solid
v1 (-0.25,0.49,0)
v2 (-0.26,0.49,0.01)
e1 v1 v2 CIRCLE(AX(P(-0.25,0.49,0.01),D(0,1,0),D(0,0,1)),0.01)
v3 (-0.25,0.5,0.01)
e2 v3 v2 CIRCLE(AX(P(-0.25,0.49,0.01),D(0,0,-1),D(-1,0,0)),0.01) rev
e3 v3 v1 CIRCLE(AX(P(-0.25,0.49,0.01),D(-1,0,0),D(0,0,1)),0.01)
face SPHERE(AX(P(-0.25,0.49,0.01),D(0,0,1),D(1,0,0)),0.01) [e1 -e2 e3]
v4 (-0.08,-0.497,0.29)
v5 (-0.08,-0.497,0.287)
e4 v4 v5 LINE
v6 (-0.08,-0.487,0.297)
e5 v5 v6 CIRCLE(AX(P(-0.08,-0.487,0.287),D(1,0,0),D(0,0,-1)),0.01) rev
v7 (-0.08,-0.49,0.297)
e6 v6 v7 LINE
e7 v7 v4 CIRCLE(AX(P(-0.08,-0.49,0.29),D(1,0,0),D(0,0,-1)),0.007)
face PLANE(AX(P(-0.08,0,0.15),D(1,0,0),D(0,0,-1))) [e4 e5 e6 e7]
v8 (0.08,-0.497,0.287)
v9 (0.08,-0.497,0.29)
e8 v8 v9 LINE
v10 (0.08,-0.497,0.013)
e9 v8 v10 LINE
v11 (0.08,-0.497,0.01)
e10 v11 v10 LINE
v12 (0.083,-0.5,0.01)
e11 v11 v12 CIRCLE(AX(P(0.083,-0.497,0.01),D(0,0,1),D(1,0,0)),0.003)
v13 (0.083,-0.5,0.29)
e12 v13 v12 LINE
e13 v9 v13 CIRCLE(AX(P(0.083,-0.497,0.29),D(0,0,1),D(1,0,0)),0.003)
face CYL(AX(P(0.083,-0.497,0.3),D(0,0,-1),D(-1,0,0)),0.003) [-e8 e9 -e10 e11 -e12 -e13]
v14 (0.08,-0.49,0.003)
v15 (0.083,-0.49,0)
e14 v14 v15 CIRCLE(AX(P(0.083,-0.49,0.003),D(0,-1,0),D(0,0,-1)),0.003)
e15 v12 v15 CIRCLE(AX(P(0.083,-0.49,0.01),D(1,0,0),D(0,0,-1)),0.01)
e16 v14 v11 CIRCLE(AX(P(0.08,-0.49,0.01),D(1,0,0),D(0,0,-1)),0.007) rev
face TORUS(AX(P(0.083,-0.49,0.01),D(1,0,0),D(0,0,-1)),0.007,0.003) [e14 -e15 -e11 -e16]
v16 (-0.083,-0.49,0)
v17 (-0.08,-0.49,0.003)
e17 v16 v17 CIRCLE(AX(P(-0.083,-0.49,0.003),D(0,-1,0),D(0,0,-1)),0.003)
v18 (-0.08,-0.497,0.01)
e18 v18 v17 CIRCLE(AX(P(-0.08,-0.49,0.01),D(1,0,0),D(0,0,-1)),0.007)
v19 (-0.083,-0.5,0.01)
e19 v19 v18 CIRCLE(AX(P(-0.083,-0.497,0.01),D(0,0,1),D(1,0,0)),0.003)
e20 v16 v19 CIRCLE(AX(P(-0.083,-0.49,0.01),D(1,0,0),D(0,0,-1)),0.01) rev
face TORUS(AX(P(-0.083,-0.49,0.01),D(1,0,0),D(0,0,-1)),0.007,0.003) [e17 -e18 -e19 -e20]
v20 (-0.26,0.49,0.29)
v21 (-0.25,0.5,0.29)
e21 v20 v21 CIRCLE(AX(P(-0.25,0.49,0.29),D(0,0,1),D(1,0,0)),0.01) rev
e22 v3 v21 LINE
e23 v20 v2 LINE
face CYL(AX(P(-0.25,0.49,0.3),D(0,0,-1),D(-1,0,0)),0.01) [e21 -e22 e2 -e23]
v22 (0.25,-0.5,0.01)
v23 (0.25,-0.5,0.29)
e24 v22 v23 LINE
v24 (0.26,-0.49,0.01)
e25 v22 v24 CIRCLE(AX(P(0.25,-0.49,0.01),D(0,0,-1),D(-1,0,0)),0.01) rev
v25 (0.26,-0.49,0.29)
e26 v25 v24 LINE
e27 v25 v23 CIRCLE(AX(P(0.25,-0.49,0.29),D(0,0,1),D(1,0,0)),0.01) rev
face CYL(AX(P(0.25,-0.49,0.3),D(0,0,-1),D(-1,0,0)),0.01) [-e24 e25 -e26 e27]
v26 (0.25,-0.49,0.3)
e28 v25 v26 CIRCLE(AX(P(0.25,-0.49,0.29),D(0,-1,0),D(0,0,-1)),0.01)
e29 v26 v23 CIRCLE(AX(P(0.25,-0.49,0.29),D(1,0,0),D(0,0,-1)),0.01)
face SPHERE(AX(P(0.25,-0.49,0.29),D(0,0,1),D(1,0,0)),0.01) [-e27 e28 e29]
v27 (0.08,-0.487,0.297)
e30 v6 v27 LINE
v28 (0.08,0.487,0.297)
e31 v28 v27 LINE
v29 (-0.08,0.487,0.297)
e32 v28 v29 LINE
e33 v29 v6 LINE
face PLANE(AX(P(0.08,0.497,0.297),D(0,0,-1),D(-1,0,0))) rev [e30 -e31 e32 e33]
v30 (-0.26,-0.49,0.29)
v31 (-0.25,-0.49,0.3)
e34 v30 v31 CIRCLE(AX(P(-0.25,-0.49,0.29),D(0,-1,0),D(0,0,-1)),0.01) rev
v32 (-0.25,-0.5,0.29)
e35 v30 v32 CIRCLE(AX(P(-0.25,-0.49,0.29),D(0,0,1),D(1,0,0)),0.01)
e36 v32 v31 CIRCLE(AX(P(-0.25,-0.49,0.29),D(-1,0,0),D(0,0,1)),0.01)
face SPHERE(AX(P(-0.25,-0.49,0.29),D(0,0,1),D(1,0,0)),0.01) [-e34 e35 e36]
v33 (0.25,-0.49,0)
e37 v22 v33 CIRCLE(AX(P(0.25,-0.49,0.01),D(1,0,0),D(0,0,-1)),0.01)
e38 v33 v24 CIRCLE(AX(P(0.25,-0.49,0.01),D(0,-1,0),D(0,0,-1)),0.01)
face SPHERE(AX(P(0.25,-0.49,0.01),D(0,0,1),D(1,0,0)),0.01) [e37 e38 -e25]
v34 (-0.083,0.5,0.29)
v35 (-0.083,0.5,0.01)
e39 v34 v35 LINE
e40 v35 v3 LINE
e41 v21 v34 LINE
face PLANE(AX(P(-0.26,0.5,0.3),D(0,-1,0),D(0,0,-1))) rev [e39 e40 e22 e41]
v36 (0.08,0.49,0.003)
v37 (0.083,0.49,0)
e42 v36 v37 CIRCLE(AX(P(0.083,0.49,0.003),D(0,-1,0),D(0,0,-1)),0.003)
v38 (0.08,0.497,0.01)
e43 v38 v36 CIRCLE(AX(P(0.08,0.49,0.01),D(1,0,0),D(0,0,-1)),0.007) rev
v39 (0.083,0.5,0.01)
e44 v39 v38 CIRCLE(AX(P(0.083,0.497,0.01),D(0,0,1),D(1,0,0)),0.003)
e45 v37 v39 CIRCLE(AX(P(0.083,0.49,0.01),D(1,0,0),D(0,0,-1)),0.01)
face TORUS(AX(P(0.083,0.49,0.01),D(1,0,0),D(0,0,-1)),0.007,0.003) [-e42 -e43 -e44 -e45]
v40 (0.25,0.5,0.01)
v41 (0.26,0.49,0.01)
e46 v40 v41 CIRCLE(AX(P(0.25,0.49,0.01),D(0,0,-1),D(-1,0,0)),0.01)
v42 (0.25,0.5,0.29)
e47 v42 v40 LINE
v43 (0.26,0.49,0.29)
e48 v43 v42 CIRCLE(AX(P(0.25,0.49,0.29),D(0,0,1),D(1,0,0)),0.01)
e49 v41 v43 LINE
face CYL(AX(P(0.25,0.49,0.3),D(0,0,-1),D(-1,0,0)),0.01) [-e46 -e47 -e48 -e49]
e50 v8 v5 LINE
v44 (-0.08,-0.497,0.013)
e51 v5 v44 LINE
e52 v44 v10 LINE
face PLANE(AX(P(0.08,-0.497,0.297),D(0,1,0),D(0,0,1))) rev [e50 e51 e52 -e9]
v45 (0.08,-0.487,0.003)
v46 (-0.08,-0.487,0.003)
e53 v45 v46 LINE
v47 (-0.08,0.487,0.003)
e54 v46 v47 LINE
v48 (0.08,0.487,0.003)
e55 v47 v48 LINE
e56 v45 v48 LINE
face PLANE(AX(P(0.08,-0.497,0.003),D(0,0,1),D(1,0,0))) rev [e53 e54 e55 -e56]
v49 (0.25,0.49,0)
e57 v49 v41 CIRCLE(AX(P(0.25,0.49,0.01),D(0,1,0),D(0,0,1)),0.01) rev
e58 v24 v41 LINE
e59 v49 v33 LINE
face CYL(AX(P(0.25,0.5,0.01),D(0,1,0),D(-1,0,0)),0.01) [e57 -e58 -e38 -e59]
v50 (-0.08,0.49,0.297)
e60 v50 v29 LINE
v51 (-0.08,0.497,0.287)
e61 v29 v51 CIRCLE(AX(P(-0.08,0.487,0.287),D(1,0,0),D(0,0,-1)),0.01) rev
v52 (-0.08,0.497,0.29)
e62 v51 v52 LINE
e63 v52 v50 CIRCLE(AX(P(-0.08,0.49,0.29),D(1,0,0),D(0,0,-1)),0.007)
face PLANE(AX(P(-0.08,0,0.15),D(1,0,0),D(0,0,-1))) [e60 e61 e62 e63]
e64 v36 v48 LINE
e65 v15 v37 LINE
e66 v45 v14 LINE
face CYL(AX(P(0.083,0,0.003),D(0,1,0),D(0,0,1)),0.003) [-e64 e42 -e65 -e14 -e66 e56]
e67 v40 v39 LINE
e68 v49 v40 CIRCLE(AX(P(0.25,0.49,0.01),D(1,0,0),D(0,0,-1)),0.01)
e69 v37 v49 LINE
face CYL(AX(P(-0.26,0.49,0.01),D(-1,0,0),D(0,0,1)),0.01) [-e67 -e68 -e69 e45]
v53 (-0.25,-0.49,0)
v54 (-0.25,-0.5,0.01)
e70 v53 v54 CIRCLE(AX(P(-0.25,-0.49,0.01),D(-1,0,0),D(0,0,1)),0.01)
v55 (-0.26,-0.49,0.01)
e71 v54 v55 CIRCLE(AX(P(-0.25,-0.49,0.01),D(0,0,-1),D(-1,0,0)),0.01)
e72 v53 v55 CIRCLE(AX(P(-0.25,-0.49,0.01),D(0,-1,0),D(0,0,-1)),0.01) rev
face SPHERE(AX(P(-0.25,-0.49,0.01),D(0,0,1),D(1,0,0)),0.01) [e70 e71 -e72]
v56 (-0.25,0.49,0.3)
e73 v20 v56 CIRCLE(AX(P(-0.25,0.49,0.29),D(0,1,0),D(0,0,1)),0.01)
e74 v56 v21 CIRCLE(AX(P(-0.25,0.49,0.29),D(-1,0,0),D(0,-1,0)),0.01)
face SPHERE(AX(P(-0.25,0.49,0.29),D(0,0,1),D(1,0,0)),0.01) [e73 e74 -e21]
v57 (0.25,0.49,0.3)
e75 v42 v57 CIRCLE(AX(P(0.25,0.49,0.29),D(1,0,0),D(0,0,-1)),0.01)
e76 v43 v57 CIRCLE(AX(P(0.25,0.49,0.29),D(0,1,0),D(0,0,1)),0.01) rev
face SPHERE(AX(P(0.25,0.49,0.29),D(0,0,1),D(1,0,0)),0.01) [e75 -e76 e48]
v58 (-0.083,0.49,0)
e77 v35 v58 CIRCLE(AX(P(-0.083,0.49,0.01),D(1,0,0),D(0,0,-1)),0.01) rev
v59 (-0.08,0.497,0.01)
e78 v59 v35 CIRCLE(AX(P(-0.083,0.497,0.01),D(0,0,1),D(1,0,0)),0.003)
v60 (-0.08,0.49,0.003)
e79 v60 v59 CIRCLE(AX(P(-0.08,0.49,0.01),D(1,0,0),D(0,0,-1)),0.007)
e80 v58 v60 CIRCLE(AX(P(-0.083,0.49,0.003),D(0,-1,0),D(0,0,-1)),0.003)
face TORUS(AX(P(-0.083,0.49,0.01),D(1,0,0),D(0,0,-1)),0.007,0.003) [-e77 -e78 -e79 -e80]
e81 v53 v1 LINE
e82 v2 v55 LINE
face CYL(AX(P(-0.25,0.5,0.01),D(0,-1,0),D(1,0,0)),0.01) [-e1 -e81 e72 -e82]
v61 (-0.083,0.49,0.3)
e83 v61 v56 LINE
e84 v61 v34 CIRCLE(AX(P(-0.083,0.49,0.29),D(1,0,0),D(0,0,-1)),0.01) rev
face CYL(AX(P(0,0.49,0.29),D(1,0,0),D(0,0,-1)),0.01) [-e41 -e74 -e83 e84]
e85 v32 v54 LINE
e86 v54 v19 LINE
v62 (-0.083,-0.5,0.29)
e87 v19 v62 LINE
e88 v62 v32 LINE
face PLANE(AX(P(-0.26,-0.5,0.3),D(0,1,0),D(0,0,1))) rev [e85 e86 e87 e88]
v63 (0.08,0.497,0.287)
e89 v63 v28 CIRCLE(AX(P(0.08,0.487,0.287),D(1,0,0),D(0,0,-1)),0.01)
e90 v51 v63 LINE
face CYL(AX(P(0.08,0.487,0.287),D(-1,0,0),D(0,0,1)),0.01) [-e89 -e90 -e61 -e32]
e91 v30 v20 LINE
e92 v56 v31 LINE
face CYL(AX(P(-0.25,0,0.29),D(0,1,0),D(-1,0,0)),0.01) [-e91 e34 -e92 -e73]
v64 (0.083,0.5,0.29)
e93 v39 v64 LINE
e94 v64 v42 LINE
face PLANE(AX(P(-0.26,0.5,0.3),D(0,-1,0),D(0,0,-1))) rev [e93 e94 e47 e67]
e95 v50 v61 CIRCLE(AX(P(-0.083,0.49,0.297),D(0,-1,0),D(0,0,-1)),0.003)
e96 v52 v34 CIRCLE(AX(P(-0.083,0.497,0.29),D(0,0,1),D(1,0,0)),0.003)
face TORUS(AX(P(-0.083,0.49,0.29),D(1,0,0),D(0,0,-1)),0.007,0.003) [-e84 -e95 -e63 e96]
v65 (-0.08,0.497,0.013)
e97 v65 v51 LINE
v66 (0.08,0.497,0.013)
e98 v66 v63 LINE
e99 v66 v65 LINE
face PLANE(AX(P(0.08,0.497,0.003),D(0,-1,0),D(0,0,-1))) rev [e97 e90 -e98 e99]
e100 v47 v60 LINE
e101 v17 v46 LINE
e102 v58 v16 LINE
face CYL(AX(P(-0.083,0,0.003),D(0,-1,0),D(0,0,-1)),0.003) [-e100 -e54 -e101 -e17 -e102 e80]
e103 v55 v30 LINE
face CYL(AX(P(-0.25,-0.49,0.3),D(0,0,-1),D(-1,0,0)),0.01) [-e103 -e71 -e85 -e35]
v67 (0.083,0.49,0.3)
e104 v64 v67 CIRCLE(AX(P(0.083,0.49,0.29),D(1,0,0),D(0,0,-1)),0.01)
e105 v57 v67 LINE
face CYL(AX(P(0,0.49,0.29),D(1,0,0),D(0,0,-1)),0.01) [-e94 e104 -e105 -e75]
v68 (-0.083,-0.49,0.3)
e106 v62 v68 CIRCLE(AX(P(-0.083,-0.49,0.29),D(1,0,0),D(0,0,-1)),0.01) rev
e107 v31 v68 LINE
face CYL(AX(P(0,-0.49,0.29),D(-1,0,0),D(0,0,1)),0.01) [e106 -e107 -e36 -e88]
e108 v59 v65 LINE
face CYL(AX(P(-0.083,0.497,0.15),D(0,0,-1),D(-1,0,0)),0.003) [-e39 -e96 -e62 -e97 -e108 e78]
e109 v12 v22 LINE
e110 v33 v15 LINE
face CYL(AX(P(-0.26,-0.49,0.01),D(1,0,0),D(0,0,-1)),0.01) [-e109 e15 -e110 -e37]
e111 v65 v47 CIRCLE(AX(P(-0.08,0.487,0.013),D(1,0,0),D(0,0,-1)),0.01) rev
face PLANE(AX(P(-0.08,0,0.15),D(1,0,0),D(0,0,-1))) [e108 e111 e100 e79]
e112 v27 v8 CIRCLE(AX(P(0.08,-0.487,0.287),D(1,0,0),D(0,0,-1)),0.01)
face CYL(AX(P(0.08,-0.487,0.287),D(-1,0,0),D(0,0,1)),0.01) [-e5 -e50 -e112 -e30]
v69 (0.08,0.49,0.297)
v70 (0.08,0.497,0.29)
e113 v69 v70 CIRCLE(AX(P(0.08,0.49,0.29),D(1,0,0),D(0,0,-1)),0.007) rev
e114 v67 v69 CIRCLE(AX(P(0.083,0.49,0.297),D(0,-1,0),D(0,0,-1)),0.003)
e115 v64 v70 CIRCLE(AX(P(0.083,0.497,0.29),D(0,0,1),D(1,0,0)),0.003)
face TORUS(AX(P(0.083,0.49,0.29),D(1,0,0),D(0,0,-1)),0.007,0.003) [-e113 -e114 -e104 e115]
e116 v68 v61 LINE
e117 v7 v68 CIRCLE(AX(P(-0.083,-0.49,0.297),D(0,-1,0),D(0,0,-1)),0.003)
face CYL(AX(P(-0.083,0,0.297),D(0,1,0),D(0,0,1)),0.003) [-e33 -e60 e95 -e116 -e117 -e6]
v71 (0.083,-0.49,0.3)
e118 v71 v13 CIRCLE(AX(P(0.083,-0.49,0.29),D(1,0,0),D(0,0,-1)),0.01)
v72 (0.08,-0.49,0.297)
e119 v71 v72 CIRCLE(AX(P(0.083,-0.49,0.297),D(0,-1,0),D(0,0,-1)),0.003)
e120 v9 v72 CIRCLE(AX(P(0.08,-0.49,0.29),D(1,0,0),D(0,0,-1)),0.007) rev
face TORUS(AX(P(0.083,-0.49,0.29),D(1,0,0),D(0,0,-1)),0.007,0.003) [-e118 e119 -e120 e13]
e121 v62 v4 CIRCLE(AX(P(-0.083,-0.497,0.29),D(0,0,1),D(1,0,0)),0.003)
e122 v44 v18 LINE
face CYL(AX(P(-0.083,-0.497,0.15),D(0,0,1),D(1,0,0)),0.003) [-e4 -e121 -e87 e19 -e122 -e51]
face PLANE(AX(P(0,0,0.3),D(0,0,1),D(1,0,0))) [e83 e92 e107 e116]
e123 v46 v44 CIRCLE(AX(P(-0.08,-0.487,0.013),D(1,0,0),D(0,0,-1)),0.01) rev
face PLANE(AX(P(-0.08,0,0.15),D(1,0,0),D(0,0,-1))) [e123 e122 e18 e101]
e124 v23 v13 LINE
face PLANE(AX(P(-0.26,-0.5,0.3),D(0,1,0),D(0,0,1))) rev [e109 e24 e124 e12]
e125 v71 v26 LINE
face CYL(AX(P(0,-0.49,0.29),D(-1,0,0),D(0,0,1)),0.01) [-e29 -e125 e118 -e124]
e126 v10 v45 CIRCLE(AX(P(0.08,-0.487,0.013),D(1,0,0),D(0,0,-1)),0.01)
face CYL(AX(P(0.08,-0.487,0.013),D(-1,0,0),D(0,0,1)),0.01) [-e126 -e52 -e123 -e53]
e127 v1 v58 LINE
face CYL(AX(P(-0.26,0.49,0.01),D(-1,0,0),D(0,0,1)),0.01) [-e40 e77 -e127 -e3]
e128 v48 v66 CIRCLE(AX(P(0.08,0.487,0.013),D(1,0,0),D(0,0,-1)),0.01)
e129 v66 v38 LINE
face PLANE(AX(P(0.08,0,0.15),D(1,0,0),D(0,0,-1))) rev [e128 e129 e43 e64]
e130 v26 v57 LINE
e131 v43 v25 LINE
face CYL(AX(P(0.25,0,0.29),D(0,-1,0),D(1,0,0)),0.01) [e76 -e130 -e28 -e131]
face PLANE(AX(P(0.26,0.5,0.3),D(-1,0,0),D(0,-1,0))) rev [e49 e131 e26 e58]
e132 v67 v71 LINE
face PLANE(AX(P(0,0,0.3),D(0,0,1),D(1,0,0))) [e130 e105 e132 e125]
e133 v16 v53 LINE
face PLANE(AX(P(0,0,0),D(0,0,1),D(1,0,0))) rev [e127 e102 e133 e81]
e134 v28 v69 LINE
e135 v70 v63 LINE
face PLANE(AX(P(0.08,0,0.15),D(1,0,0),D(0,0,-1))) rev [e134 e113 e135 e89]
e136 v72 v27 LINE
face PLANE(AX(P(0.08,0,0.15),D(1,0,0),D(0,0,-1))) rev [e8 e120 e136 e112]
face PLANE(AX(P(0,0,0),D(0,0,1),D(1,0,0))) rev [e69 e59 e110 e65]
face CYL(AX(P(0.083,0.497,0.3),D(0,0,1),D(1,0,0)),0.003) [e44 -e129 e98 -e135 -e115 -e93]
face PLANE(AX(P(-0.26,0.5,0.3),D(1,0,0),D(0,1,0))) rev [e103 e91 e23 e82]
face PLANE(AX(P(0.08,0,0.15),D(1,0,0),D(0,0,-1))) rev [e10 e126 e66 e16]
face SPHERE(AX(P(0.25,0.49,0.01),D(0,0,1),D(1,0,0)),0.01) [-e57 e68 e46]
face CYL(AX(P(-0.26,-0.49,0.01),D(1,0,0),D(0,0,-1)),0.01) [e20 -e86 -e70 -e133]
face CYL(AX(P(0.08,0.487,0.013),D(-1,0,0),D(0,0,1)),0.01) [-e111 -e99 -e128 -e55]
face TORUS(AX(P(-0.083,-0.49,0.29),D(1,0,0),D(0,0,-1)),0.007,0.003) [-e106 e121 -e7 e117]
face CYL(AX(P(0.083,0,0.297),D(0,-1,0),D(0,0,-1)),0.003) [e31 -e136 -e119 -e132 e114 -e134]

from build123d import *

# Parameters (mm, degrees)
SKETCH1_W                           = 0.52
SKETCH1_H                           = 1
ALL_BODY_DEPTH                      = 0.3
CUT_OUT_THE_BODY_FOR_PIN_DEPTH      = 0.08
CUT_OUT_THE_BODY_FOR_PIN_DEPTH_BACK = 0.08
SKETCH2_OUTSIDE_W                   = 2.534
SKETCH2_OUTSIDE_H                   = 3.234
SKETCH2_OUTSIDE_W_2                 = 0.294
SKETCH2_OUTSIDE_H_2                 = 0.994
BODY_FILLET_R                       = 0.01
PIN_FILLET_A_R                      = 0.01
PIN_FILLET_B_R                      = 0.003


with BuildPart() as part:
    # Sketch1 → All body (new body)
    with BuildSketch(Plane.XY):
        Rectangle(SKETCH1_W, SKETCH1_H)
    extrude(amount=ALL_BODY_DEPTH)

    # Sketch2 outside → Cut out the body for pin (cut, two sides: drawn at the far end of the back side and taken through both)
    with BuildSketch(Plane(origin=(0, 0, 0), x_dir=(0, 0, -1), z_dir=(1, 0, 0)).offset(-CUT_OUT_THE_BODY_FOR_PIN_DEPTH_BACK)):
        with Locations((-0.15, 0)):
            Rectangle(SKETCH2_OUTSIDE_W, SKETCH2_OUTSIDE_H)
        with Locations((-0.15, 0)):
            Rectangle(SKETCH2_OUTSIDE_W_2, SKETCH2_OUTSIDE_H_2, mode=Mode.SUBTRACT)
    extrude(amount=CUT_OUT_THE_BODY_FOR_PIN_DEPTH + CUT_OUT_THE_BODY_FOR_PIN_DEPTH_BACK, mode=Mode.SUBTRACT)

    # Body fillet
    body_fillet_edges = [part.edges().sort_by_distance(p)[0] for p in [
        (0, 0.497, 0.003),
        (0, 0.497, 0.297),
        (0, -0.497, 0.297),
        (0, -0.497, 0.003),
    ]]
    fillet(body_fillet_edges, radius=BODY_FILLET_R)

    # Pin fillet a
    pin_fillet_a_edges = [part.edges().sort_by_distance(p)[0] for p in [
        (0.26, 0, 0.3),
        (-0.17, 0.5, 0),
        (0.17, -0.5, 0),
        (0.17, -0.5, 0.3),
        (-0.17, 0.5, 0.3),
        (0.17, 0.5, 0.3),
        (-0.26, 0, 0.3),
        (0.17, 0.5, 0),
        (0.26, 0, 0),
        (-0.17, -0.5, 0),
        (-0.26, 0, 0),
        (-0.26, 0.5, 0.15),
        (0.26, 0.5, 0.15),
        (0.26, -0.5, 0.15),
        (-0.26, -0.5, 0.15),
        (-0.17, -0.5, 0.3),
    ]]
    fillet(pin_fillet_a_edges, radius=PIN_FILLET_A_R)

    # Pin fillet b
    pin_fillet_b_edges = [part.edges().sort_by_distance(p)[0] for p in [
        (0.08, -0.5, 0.15),
        (0.08, 0, 0.3),
        (0.08, 0.5, 0.15),
        (0.08, 0, 0),
        (-0.08, 0.5, 0.15),
        (-0.08, 0, 0.3),
        (-0.08, -0.5, 0.15),
        (-0.08, 0, 0),
        (0.08, 0.497071068, 0.002928932),
        (0.08, -0.497071068, 0.002928932),
        (0.08, -0.497071068, 0.297071068),
        (0.08, 0.497071068, 0.297071068),
        (-0.08, -0.497071068, 0.297071068),
        (-0.08, 0.497071068, 0.297071068),
        (-0.08, -0.497071068, 0.002928932),
        (-0.08, 0.497071068, 0.002928932),
    ]]
    fillet(pin_fillet_b_edges, radius=PIN_FILLET_B_R - 0.0001)  # a hair under: the kernel refuses the full size


solid = part.part
